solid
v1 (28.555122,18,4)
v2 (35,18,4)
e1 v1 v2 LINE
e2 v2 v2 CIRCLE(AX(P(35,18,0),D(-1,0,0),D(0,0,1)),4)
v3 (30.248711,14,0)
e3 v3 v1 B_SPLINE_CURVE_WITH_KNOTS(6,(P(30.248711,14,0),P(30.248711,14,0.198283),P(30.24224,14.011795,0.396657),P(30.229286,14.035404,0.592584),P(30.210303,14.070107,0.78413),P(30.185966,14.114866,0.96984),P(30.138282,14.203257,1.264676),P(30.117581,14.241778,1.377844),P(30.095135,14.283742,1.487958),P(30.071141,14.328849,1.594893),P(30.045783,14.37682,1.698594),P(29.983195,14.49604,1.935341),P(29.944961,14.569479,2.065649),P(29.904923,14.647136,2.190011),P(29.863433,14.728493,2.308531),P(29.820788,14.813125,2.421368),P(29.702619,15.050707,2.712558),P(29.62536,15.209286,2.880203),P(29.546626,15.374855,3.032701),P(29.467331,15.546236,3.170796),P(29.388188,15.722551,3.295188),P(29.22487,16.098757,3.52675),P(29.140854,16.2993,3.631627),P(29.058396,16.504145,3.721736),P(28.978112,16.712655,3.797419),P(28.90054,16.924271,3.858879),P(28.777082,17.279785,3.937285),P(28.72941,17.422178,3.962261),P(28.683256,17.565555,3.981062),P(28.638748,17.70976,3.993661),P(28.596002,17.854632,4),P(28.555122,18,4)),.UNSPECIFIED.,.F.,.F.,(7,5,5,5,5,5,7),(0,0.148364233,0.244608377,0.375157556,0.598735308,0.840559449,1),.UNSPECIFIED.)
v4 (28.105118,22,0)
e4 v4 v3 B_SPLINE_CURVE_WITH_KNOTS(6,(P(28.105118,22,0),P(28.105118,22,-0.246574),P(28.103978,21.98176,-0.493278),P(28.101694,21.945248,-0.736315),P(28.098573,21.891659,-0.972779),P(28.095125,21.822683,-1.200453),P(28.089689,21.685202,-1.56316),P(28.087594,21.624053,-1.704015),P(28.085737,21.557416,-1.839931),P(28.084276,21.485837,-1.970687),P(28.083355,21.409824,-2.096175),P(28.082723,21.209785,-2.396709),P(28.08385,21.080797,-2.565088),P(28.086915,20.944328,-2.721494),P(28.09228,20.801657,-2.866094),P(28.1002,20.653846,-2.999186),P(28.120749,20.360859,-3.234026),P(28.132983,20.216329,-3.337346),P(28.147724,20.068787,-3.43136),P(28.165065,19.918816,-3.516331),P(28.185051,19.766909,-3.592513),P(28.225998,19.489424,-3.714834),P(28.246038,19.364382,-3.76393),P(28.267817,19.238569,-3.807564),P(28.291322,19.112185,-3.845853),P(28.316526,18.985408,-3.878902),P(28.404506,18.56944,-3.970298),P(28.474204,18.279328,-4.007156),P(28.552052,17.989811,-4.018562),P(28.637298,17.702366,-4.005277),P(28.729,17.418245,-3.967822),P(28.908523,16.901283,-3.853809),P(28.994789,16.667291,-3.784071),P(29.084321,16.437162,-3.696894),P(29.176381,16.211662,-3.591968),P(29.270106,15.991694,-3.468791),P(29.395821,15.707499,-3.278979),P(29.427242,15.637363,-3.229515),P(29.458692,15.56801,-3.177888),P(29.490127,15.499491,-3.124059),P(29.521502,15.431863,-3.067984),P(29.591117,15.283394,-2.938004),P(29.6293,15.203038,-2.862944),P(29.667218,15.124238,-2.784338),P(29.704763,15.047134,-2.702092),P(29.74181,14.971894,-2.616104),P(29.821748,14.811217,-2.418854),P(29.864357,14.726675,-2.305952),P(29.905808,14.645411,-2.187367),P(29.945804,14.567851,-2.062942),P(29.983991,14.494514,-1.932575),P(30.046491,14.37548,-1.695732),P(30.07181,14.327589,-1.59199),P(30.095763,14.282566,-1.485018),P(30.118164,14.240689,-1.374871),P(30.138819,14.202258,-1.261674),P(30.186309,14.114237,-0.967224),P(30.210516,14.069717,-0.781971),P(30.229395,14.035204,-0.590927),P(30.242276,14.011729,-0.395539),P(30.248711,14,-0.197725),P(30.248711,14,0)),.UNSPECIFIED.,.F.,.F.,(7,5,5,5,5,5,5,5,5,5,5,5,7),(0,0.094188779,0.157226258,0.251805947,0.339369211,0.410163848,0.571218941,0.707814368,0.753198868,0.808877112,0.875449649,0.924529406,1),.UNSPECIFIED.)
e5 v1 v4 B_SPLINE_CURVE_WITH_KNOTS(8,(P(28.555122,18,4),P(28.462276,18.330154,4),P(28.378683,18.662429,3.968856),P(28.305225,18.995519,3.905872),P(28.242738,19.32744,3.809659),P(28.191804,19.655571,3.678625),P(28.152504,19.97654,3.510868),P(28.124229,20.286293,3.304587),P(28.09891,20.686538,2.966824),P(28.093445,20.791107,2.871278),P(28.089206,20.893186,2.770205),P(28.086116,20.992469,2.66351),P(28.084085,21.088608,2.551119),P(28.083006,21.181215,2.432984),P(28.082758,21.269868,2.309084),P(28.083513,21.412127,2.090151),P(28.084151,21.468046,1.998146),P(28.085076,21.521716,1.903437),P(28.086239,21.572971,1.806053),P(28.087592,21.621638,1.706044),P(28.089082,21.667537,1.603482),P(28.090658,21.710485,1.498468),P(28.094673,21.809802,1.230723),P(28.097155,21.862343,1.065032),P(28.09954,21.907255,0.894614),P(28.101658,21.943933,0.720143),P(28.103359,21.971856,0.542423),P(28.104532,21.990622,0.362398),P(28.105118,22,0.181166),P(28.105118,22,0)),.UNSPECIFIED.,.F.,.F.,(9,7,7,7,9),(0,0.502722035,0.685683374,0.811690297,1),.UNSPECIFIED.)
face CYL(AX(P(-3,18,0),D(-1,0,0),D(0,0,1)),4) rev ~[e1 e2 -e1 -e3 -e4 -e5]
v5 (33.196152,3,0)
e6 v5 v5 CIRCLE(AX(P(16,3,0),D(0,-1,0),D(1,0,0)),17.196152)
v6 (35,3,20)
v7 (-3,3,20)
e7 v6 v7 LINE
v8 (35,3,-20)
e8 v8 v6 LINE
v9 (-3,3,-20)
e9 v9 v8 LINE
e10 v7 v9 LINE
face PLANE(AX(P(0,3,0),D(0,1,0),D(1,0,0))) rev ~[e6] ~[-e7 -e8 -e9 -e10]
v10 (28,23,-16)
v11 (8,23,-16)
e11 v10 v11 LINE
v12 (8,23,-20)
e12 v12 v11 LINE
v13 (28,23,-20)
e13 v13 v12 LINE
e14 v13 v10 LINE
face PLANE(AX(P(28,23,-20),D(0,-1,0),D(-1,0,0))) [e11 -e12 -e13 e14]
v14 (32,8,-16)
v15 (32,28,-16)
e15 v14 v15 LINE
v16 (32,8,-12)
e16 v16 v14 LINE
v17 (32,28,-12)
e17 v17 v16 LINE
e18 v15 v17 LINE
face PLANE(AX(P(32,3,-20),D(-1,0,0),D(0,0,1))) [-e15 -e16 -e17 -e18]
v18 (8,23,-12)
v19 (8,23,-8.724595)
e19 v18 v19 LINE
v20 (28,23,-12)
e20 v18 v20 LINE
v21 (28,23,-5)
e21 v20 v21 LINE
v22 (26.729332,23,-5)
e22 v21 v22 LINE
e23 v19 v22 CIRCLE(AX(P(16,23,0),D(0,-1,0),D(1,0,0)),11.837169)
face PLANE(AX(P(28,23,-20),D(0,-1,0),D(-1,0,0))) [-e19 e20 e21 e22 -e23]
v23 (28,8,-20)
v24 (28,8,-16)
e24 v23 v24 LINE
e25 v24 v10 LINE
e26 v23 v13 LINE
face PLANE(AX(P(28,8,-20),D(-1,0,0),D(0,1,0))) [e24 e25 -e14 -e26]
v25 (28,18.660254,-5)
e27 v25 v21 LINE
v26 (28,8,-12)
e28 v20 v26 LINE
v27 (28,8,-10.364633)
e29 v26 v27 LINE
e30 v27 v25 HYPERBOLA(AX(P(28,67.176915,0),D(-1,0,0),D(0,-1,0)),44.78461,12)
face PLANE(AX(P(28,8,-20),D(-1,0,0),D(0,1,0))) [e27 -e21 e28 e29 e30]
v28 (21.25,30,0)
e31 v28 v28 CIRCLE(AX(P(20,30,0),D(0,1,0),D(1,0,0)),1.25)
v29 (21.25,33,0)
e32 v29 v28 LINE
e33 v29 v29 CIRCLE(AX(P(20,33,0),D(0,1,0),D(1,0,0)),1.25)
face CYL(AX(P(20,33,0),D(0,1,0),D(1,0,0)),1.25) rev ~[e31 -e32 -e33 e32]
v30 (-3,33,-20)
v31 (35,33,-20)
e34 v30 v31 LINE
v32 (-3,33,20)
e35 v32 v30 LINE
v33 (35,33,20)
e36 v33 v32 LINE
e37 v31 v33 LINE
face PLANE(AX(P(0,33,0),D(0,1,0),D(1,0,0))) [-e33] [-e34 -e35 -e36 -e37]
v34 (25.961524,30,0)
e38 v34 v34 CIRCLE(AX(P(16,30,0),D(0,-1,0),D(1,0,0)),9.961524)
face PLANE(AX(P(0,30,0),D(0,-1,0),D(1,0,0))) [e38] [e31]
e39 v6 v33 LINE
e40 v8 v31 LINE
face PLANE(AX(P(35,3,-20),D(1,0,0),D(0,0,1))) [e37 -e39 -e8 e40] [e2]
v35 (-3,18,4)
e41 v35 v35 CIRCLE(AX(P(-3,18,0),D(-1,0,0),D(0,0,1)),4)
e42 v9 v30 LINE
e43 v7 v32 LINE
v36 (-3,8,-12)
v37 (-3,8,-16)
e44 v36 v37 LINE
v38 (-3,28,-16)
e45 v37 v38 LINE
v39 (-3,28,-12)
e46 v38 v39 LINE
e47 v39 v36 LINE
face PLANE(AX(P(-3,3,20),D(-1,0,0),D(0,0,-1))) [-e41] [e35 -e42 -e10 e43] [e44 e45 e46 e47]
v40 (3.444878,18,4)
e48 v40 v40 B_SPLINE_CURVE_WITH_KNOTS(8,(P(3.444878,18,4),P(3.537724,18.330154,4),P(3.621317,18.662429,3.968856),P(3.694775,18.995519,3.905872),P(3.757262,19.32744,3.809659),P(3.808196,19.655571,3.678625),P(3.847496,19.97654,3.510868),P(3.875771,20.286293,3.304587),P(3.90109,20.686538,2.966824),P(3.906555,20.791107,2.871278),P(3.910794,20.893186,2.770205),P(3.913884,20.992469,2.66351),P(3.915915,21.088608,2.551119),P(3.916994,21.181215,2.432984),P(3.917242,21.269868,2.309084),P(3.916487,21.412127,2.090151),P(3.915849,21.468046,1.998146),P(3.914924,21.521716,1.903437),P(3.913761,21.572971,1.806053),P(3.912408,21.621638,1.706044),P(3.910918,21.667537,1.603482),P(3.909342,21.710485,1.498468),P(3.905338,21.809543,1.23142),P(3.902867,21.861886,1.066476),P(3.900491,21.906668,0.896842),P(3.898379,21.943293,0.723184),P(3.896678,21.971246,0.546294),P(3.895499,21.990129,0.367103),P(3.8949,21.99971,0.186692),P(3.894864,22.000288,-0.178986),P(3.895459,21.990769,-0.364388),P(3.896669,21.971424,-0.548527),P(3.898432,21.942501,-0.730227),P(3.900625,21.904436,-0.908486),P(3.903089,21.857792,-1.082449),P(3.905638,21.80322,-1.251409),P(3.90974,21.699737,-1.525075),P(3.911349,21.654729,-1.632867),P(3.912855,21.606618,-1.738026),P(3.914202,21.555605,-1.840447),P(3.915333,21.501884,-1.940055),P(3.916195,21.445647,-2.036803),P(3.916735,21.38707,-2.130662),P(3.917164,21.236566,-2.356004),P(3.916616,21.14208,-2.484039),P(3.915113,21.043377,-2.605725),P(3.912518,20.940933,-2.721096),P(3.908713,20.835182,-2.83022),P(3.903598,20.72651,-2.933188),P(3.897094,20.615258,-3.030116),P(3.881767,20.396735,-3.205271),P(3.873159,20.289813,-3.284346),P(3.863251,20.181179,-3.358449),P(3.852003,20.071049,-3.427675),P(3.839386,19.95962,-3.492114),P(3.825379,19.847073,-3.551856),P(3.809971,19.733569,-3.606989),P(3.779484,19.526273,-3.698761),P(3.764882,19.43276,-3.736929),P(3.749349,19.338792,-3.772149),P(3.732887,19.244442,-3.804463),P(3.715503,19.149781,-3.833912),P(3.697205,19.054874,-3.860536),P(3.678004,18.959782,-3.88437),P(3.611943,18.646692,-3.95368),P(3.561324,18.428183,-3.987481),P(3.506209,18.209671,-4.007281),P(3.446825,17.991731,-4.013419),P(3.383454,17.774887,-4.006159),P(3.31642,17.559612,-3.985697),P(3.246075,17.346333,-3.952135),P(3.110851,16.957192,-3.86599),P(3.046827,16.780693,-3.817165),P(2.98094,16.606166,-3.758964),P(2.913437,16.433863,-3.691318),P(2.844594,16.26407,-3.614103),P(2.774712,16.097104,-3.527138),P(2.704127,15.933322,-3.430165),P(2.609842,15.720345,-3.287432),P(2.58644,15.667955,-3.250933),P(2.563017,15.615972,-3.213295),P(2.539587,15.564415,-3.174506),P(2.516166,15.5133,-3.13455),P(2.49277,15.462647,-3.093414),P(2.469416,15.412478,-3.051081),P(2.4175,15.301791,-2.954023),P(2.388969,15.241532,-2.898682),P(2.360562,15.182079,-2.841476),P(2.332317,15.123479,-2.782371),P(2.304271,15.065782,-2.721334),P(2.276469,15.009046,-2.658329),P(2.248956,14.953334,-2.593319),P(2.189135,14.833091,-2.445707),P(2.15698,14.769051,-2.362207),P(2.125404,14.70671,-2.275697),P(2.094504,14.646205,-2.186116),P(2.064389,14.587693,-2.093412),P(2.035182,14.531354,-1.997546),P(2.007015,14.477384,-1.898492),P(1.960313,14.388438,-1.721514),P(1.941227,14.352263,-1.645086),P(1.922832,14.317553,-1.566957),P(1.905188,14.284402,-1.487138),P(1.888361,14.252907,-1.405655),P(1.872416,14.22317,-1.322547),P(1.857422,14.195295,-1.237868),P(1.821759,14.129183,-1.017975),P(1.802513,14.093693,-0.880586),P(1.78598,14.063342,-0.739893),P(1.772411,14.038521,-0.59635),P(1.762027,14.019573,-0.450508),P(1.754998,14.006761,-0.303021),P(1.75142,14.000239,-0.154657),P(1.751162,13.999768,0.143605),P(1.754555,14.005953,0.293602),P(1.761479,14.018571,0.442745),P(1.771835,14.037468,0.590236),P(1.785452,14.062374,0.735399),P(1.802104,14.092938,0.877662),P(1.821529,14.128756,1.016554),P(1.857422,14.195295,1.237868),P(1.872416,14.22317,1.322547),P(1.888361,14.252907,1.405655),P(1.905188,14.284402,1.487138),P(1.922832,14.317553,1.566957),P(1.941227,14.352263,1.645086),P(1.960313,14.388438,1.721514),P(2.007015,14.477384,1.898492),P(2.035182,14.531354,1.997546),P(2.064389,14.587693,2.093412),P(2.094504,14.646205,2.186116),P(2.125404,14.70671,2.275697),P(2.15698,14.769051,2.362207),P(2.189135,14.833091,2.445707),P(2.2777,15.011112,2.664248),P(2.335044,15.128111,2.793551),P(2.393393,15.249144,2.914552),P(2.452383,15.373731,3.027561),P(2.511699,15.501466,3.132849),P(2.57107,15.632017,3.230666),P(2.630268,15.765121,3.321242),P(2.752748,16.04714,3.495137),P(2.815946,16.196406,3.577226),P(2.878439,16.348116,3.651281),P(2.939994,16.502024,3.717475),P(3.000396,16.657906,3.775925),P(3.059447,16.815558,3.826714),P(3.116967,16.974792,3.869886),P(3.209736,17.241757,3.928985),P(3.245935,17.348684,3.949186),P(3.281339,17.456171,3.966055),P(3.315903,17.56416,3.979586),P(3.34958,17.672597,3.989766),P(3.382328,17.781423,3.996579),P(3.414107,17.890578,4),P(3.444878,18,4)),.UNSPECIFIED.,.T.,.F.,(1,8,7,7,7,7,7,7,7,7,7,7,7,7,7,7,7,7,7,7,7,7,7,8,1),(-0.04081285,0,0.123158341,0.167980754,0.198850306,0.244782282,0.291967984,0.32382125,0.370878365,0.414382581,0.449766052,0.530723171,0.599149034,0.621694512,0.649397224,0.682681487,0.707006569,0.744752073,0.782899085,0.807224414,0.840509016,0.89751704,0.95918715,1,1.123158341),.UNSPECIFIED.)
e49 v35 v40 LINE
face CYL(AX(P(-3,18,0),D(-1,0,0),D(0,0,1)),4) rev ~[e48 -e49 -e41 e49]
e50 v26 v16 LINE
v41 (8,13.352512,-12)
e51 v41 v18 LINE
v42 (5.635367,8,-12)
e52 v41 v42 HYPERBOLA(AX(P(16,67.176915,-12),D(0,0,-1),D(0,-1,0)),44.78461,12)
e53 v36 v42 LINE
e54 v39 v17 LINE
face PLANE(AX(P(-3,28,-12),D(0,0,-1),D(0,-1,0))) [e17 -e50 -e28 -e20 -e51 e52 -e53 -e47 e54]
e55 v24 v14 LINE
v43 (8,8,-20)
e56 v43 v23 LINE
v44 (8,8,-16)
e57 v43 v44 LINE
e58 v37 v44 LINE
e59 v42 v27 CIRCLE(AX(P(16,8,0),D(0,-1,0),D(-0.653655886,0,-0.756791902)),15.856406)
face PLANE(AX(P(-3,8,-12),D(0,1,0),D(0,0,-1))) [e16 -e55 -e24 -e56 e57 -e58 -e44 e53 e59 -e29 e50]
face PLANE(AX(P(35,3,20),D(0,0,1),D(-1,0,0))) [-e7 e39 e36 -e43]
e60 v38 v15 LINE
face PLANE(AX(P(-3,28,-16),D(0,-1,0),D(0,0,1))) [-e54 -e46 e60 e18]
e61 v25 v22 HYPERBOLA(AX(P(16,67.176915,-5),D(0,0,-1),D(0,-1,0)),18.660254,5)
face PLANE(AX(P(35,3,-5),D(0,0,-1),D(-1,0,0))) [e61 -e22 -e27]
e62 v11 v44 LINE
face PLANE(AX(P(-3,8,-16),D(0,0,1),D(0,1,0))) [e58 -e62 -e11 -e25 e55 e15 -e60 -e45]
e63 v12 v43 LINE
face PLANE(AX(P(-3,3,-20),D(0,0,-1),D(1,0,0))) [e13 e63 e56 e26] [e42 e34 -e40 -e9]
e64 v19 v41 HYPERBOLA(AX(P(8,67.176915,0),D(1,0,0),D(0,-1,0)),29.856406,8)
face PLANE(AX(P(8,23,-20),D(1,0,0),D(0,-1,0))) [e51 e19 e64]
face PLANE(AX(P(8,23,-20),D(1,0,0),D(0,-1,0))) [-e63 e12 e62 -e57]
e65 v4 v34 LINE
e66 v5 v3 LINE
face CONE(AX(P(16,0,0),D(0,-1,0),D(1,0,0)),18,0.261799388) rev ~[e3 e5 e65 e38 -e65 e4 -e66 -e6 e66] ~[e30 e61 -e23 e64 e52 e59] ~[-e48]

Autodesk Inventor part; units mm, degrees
ref_plane "YZ Plane" through (0, 0, 0) normal (1, 0, 0) x (0, 1, 0)
ref_plane "XZ Plane" through (0, 0, 0) normal (0, 1, 0) x (-1, 0, 0)
ref_plane "XY Plane" through (0, 0, 0) normal (0, 0, 1) x (1, 0, 0)
ref_plane "Work Plane13" through (0, 3, 0) normal (0, 1, 0) x (1, 0, 0)
sketch "Sketch45" plane through (0, 3, 0) normal (0, 1, 0) x (1, 0, 0)
  line L0 (35, -20) -> (-3, -20)
  line L1 (-3, -20) -> (-3, 20)
  line L2 (-3, 20) -> (35, 20)
  line L3 (35, 20) -> (35, -20)
  point P0 (0, 0)
  dimension "d142" = 38
  dimension "d143" = 40
extrude "Extrusion34" add sketch "Sketch45" along normal blind 30
sketch "Sketch46" plane through (0, 33, 0) normal (0, 1, 0) x (1, 0, 0)
  point P0 (0, 0)
ref_plane "Work Plane11" through (0, 0, 0) normal (0, -1, 0) x (1, 0, 0)
sketch "Sketch47" plane through (0, 0, 0) normal (0, -1, 0) x (1, 0, 0)
  circle A0 centre (16, 0) radius 18
  point P0 (0, 0)
  dimension "d146" = 36
extrude "Extrusion35" cut sketch "Sketch47" against normal blind 30 draft -15
sketch "Sketch48" plane through (0, 33, 0) normal (0, 1, 0) x (1, 0, 0)
  point P0 (0, 0)
sketch "Sketch49" plane through (0, 33, 0) normal (0, 1, 0) x (1, 0, 0)
  circle A0 centre (20, 0) radius 1.25
  point P0 (0, 0)
  dimension "d149" = 2.5
extrude "Extrusion36" cut sketch "Sketch49" against normal through all
ref_plane "Work Plane7" through (35, 3, -20) normal (0, 0, -1) x (-1, 0, 0)
sketch "Sketch58" plane through (35, 3, -20) normal (0, 0, -1) x (-1, 0, 0)
  line L0 (7, 20) -> (27, 20)
  line L1 (27, 20) -> (27, 5)
  line L2 (27, 5) -> (7, 5)
  line L3 (7, 5) -> (7, 20)
  point P0 (35, -3)
  dimension "d156" = 20
  dimension "d157" = 15
extrude "Extrusion38" cut sketch "Sketch58" against normal blind 15
ref_plane "Work Plane4" through (-3, 3, -20) normal (-1, 0, 0) x (0, 0, 1)
sketch "Sketch59" plane through (-3, 3, -20) normal (-1, 0, 0) x (0, 0, 1)
  line L0 (4, 25) -> (8, 25)
  line L1 (8, 25) -> (8, 5)
  line L2 (8, 5) -> (4, 5)
  line L3 (4, 5) -> (4, 25)
  point P0 (20, -3)
  dimension "d160" = 4
  dimension "d161" = 20
extrude "Extrusion39" cut sketch "Sketch59" against normal blind 35
ref_plane "Work Plane1" through (0, 3, 0) normal (0, 1, 0) x (1, 0, 0)
ref_plane "Work Plane6" through (0, 23, 0) normal (0, 1, 0) x (1, 0, 0)
sketch "Sketch62" plane through (-3, 3, -20) normal (-1, 0, 0) x (0, 0, 1)
  circle A0 centre (20, 15) radius 4
  point P0 (20, -3)
  dimension "d172" = 8
extrude "Extrusion42" cut sketch "Sketch62" against normal through all
properties part number "liquid port_only_v02"
